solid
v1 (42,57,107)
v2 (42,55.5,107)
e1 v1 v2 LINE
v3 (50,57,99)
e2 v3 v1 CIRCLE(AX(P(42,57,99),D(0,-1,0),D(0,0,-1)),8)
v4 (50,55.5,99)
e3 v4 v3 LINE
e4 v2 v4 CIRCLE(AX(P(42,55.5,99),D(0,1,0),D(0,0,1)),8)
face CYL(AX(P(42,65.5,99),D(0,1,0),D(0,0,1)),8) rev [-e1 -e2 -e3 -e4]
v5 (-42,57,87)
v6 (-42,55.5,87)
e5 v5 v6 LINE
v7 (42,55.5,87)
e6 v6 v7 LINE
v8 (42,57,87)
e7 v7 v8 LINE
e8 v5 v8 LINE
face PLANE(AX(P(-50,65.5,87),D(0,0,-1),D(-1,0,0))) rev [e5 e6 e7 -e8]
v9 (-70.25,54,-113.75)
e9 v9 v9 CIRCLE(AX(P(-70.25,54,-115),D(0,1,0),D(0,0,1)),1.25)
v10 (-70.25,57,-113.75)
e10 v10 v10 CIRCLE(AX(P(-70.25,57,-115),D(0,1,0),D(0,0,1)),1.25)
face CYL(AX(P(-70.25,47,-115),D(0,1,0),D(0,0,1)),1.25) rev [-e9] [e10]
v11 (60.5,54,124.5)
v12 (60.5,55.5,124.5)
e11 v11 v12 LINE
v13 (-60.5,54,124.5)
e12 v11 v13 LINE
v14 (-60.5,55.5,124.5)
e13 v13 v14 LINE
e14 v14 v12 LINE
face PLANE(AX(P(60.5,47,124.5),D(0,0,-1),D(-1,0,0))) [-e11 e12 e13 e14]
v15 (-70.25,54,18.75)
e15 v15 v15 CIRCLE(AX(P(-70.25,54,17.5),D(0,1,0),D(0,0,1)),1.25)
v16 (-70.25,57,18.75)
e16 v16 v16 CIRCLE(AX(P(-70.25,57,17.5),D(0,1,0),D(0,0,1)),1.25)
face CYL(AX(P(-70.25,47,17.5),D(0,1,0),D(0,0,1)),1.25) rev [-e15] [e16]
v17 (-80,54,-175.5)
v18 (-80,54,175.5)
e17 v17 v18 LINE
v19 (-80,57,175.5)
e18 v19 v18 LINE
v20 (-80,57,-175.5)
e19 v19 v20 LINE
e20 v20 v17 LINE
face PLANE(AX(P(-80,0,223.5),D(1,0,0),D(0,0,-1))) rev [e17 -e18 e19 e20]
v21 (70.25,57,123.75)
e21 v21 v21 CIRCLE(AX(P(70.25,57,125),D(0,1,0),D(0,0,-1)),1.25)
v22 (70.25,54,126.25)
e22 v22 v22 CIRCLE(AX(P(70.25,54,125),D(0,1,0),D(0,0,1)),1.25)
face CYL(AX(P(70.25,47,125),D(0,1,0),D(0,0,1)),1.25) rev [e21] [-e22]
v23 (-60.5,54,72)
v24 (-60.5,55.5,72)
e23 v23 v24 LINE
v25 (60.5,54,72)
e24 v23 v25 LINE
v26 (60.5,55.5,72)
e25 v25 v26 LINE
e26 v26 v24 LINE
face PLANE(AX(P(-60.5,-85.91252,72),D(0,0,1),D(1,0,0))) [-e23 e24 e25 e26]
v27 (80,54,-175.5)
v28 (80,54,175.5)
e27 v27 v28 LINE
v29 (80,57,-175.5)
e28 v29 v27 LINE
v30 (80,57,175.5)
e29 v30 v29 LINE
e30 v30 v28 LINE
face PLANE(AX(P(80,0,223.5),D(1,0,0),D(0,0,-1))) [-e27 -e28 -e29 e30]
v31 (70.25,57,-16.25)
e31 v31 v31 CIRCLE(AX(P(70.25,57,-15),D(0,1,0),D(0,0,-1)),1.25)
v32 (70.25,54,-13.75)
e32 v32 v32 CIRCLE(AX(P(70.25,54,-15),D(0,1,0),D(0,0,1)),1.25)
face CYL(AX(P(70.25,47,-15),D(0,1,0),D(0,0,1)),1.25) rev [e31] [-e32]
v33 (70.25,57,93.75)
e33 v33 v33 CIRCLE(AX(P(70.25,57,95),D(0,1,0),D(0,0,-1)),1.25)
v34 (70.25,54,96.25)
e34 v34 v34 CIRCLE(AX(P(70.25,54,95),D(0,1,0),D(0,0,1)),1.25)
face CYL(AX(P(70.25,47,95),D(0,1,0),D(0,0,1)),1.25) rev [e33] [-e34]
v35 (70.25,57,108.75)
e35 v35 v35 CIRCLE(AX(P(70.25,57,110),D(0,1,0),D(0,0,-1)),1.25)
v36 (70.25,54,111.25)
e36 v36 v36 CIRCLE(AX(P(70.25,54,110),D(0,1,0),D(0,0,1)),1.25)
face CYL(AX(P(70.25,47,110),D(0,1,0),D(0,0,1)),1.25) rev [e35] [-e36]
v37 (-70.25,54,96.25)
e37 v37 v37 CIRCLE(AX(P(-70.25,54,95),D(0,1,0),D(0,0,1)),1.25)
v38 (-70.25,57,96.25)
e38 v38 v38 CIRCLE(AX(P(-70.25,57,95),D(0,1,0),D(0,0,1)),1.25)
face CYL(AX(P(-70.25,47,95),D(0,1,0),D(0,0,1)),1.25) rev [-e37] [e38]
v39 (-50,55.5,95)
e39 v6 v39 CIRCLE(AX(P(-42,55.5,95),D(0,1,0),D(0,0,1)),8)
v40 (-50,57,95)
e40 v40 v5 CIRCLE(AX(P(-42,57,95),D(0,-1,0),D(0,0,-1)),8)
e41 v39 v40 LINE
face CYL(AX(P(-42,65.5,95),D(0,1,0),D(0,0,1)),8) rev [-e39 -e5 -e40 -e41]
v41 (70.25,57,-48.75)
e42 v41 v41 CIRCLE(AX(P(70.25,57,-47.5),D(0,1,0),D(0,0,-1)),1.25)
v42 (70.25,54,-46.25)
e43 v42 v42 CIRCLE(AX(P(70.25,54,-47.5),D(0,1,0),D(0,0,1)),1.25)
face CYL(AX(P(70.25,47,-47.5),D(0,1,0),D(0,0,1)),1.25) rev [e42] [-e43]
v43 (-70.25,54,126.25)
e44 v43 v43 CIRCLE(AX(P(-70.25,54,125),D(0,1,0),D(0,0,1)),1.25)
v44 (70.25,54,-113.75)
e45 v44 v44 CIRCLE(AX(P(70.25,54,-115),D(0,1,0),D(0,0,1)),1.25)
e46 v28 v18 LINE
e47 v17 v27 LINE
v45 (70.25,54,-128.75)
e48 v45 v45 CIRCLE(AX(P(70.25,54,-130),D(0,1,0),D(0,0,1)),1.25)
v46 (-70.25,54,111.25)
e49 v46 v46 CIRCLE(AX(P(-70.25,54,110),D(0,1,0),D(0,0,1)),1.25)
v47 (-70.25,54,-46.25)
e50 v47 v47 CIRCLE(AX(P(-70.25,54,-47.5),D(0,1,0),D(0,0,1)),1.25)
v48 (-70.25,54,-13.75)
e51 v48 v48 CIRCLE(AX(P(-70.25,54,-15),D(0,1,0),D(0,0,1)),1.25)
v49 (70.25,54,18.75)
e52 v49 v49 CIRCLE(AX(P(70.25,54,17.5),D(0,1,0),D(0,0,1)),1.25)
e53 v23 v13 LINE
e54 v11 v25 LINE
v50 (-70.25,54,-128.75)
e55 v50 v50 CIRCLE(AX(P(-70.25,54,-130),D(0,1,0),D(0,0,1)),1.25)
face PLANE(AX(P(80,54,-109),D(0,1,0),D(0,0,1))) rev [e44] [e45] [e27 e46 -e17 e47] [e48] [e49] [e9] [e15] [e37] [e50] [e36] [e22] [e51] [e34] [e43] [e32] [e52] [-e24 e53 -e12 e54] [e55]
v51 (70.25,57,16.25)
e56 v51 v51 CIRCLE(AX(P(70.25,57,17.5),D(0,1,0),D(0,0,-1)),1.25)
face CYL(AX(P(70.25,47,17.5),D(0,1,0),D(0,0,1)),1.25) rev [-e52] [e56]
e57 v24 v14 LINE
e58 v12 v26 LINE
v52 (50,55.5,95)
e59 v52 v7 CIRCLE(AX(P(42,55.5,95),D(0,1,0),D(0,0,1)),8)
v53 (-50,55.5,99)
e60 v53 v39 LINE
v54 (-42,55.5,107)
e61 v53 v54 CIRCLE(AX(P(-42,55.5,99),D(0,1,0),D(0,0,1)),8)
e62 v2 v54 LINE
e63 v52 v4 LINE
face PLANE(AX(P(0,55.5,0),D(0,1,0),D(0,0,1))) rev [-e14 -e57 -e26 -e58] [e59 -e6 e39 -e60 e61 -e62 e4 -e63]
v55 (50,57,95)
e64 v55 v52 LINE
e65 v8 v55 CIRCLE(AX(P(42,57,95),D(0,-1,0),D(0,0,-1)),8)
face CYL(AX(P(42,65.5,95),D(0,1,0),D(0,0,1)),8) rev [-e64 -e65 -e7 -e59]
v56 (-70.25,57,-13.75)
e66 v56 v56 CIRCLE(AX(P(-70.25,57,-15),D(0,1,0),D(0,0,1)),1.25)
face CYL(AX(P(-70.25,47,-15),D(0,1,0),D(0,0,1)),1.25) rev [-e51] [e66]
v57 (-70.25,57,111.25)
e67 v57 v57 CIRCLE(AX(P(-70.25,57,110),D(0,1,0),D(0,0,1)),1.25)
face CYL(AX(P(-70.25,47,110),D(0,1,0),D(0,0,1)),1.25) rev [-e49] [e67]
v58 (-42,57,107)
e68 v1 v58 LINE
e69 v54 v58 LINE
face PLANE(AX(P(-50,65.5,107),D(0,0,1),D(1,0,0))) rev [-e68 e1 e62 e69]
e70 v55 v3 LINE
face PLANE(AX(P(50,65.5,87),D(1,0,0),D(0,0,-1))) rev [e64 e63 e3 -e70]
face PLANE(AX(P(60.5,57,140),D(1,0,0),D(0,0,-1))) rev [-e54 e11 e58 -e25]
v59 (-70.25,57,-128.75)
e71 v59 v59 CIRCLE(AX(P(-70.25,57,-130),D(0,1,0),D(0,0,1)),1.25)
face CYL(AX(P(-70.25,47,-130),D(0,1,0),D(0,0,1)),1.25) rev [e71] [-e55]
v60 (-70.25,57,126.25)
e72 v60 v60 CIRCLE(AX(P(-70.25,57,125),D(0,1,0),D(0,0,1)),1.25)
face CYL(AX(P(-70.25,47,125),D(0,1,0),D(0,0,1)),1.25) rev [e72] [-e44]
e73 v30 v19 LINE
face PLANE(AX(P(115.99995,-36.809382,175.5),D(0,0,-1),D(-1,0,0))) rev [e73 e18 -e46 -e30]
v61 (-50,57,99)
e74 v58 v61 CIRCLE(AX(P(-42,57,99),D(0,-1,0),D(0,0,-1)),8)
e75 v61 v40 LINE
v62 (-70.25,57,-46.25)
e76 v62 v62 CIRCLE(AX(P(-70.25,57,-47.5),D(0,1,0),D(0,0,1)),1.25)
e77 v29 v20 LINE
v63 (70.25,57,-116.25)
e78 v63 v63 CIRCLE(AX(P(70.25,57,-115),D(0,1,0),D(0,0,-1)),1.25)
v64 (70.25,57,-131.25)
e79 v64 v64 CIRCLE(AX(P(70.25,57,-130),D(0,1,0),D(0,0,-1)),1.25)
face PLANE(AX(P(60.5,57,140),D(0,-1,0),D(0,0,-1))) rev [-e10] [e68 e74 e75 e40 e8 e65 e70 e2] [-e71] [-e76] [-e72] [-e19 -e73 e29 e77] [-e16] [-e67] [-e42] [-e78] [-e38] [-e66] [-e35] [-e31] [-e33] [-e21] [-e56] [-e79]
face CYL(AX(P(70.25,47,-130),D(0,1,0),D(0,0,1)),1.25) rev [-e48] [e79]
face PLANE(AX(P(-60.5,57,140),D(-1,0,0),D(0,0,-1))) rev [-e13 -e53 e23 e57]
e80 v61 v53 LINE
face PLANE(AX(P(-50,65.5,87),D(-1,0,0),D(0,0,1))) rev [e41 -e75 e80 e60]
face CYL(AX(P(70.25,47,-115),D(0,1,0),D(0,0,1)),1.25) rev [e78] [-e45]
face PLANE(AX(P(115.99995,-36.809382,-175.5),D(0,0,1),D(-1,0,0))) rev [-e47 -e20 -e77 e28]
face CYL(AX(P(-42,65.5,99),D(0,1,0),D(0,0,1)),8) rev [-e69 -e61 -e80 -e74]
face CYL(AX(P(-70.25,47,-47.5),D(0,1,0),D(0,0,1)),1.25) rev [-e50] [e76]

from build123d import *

# Parameters (mm, degrees)
EXTRUDE_1_DEPTH          = 140
EXTRUDE_1_DEPTH_BACK     = 140
EXTRUDE_3_DEPTH          = 35.5
CUT_EXTRUDE_2_REACH      = 197.473
SKETCH_6_W               = 150
SKETCH_6_H               = 80
CUT_EXTRUDE_4_DEPTH      = 6
EXTRUDE_4_DEPTH          = 60.5
CUT_EXTRUDE_START        = -59
CUT_EXTRUDE_6_DEPTH      = 55
CUT_EXTRUDE_START_2      = -4
CUT_EXTRUDE_7_DEPTH      = 27
CUT_EXTRUDE_8_DEPTH      = 35.5
CUT_EXTRUDE_START_3      = -35.5
CUT_EXTRUDE_9_DEPTH      = 35.5
EXTRUDE_5_REACH          = 300.939
SKETCH_25_W              = 121
SKETCH_25_H              = 10
EXTRUDE_6_DEPTH          = 21.5
SKETCH_27_W              = 121
SKETCH_27_H              = 52.5
EXTRUDE_7_DEPTH          = 1.5
SKETCH_28_W              = 121
SKETCH_28_H              = 2
EXTRUDE_8_DEPTH          = 10
CUT_EXTRUDE_11_REACH     = 346.114
SKETCH_29_R              = 2
PATTERN_CIRCULAR_2_COUNT = 10
CUT_EXTRUDE_12_REACH     = 346.114
SKETCH_30_R              = 2
PATTERN_CIRCULAR_3_COUNT = 10
MIRROR_START             = -140
MIRROR_10_OUTLINE_R      = 2
MIRROR_10_DEPTH          = 280
MIRROR_10_2_OUTLINE_R    = 2
MIRROR_10_2_DEPTH        = 4
MIRROR_START_2           = 136
MIRROR_10_3_OUTLINE_R    = 2
MIRROR_10_3_DEPTH        = 4
EXTRUDE_9_REACH          = 263.648
SKETCH_31_W              = 21
SKETCH_31_H              = 16.5
EXTRUDE_10_REACH         = 292.975
SKETCH_34_W              = 121
SKETCH_34_H              = 154
EXTRUDE_11_DEPTH         = 5
EXTRUDE_12_REACH         = 378.928
SKETCH_36_W              = 121
SKETCH_36_H              = 3
EXTRUDE_13_REACH         = 378.928
SKETCH_37_W              = 121
SKETCH_37_H              = 3
SKETCH_38_W              = 100
SKETCH_38_H              = 20
CUT_EXTRUDE_13_DEPTH     = 10
FILLET_1_R               = 8
SKETCH_40_W              = 344.103621996
SKETCH_40_H              = 61.572842363
SKETCH_40_W_2            = 92.051810998
SKETCH_40_H_2            = 3
CUT_EXTRUDE_16_DEPTH     = 399
SKETCH_41_R              = 1.25
CUT_EXTRUDE_17_DEPTH     = 10


# Read off the part's stored shape, not the designer's step: 镜向10
with BuildPart() as part:
    # 草图2 → 凸台-拉伸1 (new, two sides: drawn at the far end of the back side and taken through both)
    with BuildSketch(Plane.XY.offset(-EXTRUDE_1_DEPTH_BACK)):
        with BuildLine():
            Line((60.5, 57), (80, 57))
            add(Edge.make_bspline(
                [(80, 57), (110.715171184, 57), (118.023084898, 36.99301361), (125, 20.498008369), (125, 0)],
                knots=[0, 0, 0, 0, 0, 1, 1, 1, 1, 1], degree=4))
            add(Edge.make_bspline(
                [(80, -57), (110.715171184, -57), (118.023084898, -36.99301361), (125, -20.498008369), (125, 0)],
                knots=[0, 0, 0, 0, 0, 1, 1, 1, 1, 1], degree=4))
            Line((80, -57), (60.5, -57))
            Line((60.5, -57), (60.5, -35.5))
            ThreePointArc((60.5, -35.5), (96, 0), (60.5, 35.5))
            Line((60.5, 35.5), (60.5, 57))
        make_face()
    extrude(amount=EXTRUDE_1_DEPTH + EXTRUDE_1_DEPTH_BACK)

    # 草图5 → 凸台-拉伸3 (add)
    with BuildSketch(Plane.XY.offset(140)):
        with BuildLine():
            Line((60.5, -50), (60.5, -57))
            Line((60.5, -57), (80, -57))
            add(Edge.make_bspline(
                [(80, -57), (110.715171184, -57), (118.023084898, -36.99301361), (125, -20.498008369), (125, 0)],
                knots=[0, 0, 0, 0, 0, 1, 1, 1, 1, 1], degree=4))
            add(Edge.make_bspline(
                [(125, 0), (125, 20.498008369), (118.023084898, 36.99301361), (110.715171184, 57), (80, 57)],
                knots=[0, 0, 0, 0, 0, 1, 1, 1, 1, 1], degree=4))
            Line((80, 57), (60.5, 57))
            Line((60.5, 57), (60.5, 50))
            ThreePointArc((60.5, 50), (110.5, 0), (60.5, -50))
        make_face()
    extrude_3 = extrude(amount=EXTRUDE_3_DEPTH)

    # 镜向2: 凸台-拉伸3 across plane
    add(extrude_3.mirror(Plane.XY))

    # 草图6 → 切除-拉伸2 (cut, up to next)
    with BuildSketch(Plane.ZY.offset(-60.5), mode=Mode.PRIVATE) as cut_extrude_2_sk1:
        with Locations((-15, 0)):
            Rectangle(SKETCH_6_W, SKETCH_6_H)
    cut_extrude_2_tool1 = extrude(cut_extrude_2_sk1.sketch, amount=-CUT_EXTRUDE_2_REACH, mode=Mode.PRIVATE) & part.part
    add(cut_extrude_2_tool1.solids().sort_by_distance((60.5, 0, -15))[0], mode=Mode.SUBTRACT)

    # 草图9 → 切除-拉伸4 (cut, symmetric)
    with BuildSketch(Plane(origin=(0, 0, 0), x_dir=(1, 0, 0), z_dir=(0, 1, 0))):
        Polygon((113.429186382, -60), (119.929186382, -60), (119.929186382, -75), (116.929186382, -75), (111.929186382, -69.041232037), (113.429186382, -67.541232037), align=None)
    cut_extrude_4 = extrude(amount=CUT_EXTRUDE_4_DEPTH, both=True, mode=Mode.SUBTRACT)

    # 镜向3: 切除-拉伸4 across plane
    add(cut_extrude_4.mirror(Plane(origin=(0, 0, -15), x_dir=(1, 0, 0), z_dir=(0, 0, -1))), mode=Mode.SUBTRACT)

    # 草图10 → 凸台-拉伸4 (add)
    with BuildSketch(Plane.ZY.offset(-60.5)):
        Polygon((-90, 40), (-90, 35.5), (-92, 35.5), (-92, 42), (62, 42), (62, 35.5), (60, 35.5), (60, 40), align=None)
    extrude(amount=EXTRUDE_4_DEPTH)

    # 草图18 → 切除-拉伸6 (cut)
    with BuildSketch(Plane.XY.offset(140).offset(CUT_EXTRUDE_START)):
        with BuildLine():
            Line((60.5, 54), (60.5, 35.5))
            ThreePointArc((60.5, 35.5), (96, 0), (60.5, -35.5))
            Line((60.5, -35.5), (60.5, -54))
            Line((60.5, -54), (80, -54))
            add(Edge.make_bspline(
                [(80, -54), (84.874930894, -54), (88.983824843, -53.408674679), (94.293485921, -51.914645093), (95.921328006, -51.314644751), (98.940749379, -49.944603182), (100.332473442, -49.174486853), (102.921509382, -47.489185635), (104.118858715, -46.573864409), (106.351651802, -44.617586852), (107.387031345, -43.57654345), (110.285874468, -40.291394559), (111.943828956, -37.885646851), (114.834227827, -32.778060673), (116.065931681, -30.077252128), (118.174928997, -24.486846885), (119.052306998, -21.597764181), (120.481395372, -15.683640995), (121.033233096, -12.658872533), (121.792444122, -6.461288023), (122, -3.288695832), (122, 0)],
                knots=[0, 0, 0, 0, 0.125, 0.125, 0.1875, 0.1875, 0.25, 0.25, 0.3125, 0.3125, 0.375, 0.375, 0.5, 0.5, 0.625, 0.625, 0.75, 0.75, 0.875, 0.875, 1, 1, 1, 1], degree=3))
            add(Edge.make_bspline(
                [(122, 0), (122, 3.288695832), (121.792444122, 6.461288023), (121.033233096, 12.658872533), (120.481395372, 15.683640995), (119.052306998, 21.597764181), (118.174928997, 24.486846885), (116.065931681, 30.077252128), (114.834227827, 32.778060673), (111.943828956, 37.885646851), (110.285874468, 40.291394559), (107.387031345, 43.57654345), (106.351651802, 44.617586852), (104.118858715, 46.573864409), (102.921509382, 47.489185635), (100.332473442, 49.174486853), (98.940749379, 49.944603182), (95.921328006, 51.314644751), (94.293485921, 51.914645093), (88.983824843, 53.408674679), (84.874930894, 54), (80, 54)],
                knots=[0, 0, 0, 0, 0.125, 0.125, 0.25, 0.25, 0.375, 0.375, 0.5, 0.5, 0.625, 0.625, 0.6875, 0.6875, 0.75, 0.75, 0.8125, 0.8125, 0.875, 0.875, 1, 1, 1, 1], degree=3))
            Line((80, 54), (60.5, 54))
        make_face()
    extrude(amount=CUT_EXTRUDE_6_DEPTH, mode=Mode.SUBTRACT)

    # 草图19 → 切除-拉伸7 (cut)
    with BuildSketch(Plane(origin=(0, 0, -140), x_dir=(-1, 0, 0), z_dir=(0, 0, -1)).offset(CUT_EXTRUDE_START_2)):
        with BuildLine():
            Line((-60.5, 54), (-60.5, 35.5))
            ThreePointArc((-60.5, 35.5), (-96, 0), (-60.5, -35.5))
            Line((-60.5, -35.5), (-60.5, -54))
            Line((-60.5, -54), (-80, -54))
            add(Edge.make_bspline(
                [(-80, -54), (-84.874930894, -54), (-88.983824843, -53.408674679), (-94.293485921, -51.914645093), (-95.921328006, -51.314644751), (-98.940749379, -49.944603182), (-100.332473442, -49.174486853), (-102.921509382, -47.489185635), (-104.118858715, -46.573864409), (-106.351651802, -44.617586852), (-107.387031345, -43.57654345), (-110.285874468, -40.291394559), (-111.943828956, -37.885646851), (-114.834227827, -32.778060673), (-116.065931681, -30.077252128), (-118.174928997, -24.486846885), (-119.052306998, -21.597764181), (-120.481395372, -15.683640995), (-121.033233096, -12.658872533), (-121.792444122, -6.461288023), (-122, -3.288695832), (-122, 0)],
                knots=[0, 0, 0, 0, 0.125, 0.125, 0.1875, 0.1875, 0.25, 0.25, 0.3125, 0.3125, 0.375, 0.375, 0.5, 0.5, 0.625, 0.625, 0.75, 0.75, 0.875, 0.875, 1, 1, 1, 1], degree=3))
            add(Edge.make_bspline(
                [(-122, 0), (-122, 3.288695832), (-121.792444122, 6.461288023), (-121.033233096, 12.658872533), (-120.481395372, 15.683640995), (-119.052306998, 21.597764181), (-118.174928997, 24.486846885), (-116.065931681, 30.077252128), (-114.834227827, 32.778060673), (-111.943828956, 37.885646851), (-110.285874468, 40.291394559), (-107.387031345, 43.57654345), (-106.351651802, 44.617586852), (-104.118858715, 46.573864409), (-102.921509382, 47.489185635), (-100.332473442, 49.174486853), (-98.940749379, 49.944603182), (-95.921328006, 51.314644751), (-94.293485921, 51.914645093), (-88.983824843, 53.408674679), (-84.874930894, 54), (-80, 54)],
                knots=[0, 0, 0, 0, 0.125, 0.125, 0.25, 0.25, 0.375, 0.375, 0.5, 0.5, 0.625, 0.625, 0.6875, 0.6875, 0.75, 0.75, 0.8125, 0.8125, 0.875, 0.875, 1, 1, 1, 1], degree=3))
            Line((-80, 54), (-60.5, 54))
        make_face()
    extrude(amount=-CUT_EXTRUDE_7_DEPTH, mode=Mode.SUBTRACT)

    # 草图20 → 切除-拉伸8 (cut)
    with BuildSketch(Plane.XY.offset(175.5)):
        with BuildLine():
            Line((60.5, 54), (60.5, 50))
            ThreePointArc((60.5, 50), (110.5, 0), (60.5, -50))
            Line((60.5, -50), (60.5, -54))
            Line((60.5, -54), (80, -54))
            add(Edge.make_bspline(
                [(80, -54), (84.874930894, -54), (88.983824843, -53.408674679), (94.293485921, -51.914645093), (95.921328006, -51.314644751), (98.940749379, -49.944603182), (100.332473442, -49.174486853), (102.921509382, -47.489185635), (104.118858715, -46.573864409), (106.351651802, -44.617586852), (107.387031345, -43.57654345), (110.285874468, -40.291394559), (111.943828956, -37.885646851), (114.834227827, -32.778060673), (116.065931681, -30.077252128), (118.174928997, -24.486846885), (119.052306998, -21.597764181), (120.481395372, -15.683640995), (121.033233096, -12.658872533), (121.792444122, -6.461288023), (122, -3.288695832), (122, 0)],
                knots=[0, 0, 0, 0, 0.125, 0.125, 0.1875, 0.1875, 0.25, 0.25, 0.3125, 0.3125, 0.375, 0.375, 0.5, 0.5, 0.625, 0.625, 0.75, 0.75, 0.875, 0.875, 1, 1, 1, 1], degree=3))
            add(Edge.make_bspline(
                [(122, 0), (122, 3.288695832), (121.792444122, 6.461288023), (121.033233096, 12.658872533), (120.481395372, 15.683640995), (119.052306998, 21.597764181), (118.174928997, 24.486846885), (116.065931681, 30.077252128), (114.834227827, 32.778060673), (111.943828956, 37.885646851), (110.285874468, 40.291394559), (107.387031345, 43.57654345), (106.351651802, 44.617586852), (104.118858715, 46.573864409), (102.921509382, 47.489185635), (100.332473442, 49.174486853), (98.940749379, 49.944603182), (95.921328006, 51.314644751), (94.293485921, 51.914645093), (88.983824843, 53.408674679), (84.874930894, 54), (80, 54)],
                knots=[0, 0, 0, 0, 0.125, 0.125, 0.25, 0.25, 0.375, 0.375, 0.5, 0.5, 0.625, 0.625, 0.6875, 0.6875, 0.75, 0.75, 0.8125, 0.8125, 0.875, 0.875, 1, 1, 1, 1], degree=3))
            Line((80, 54), (60.5, 54))
        make_face()
    extrude(amount=-CUT_EXTRUDE_8_DEPTH, mode=Mode.SUBTRACT)

    # 草图21 → 切除-拉伸9 (cut)
    with BuildSketch(Plane(origin=(0, 0, -175.5), x_dir=(-1, 0, 0), z_dir=(0, 0, -1)).offset(CUT_EXTRUDE_START_3)):
        with BuildLine():
            Line((-60.5, -50), (-60.5, -54))
            Line((-60.5, -54), (-80, -54))
            add(Edge.make_bspline(
                [(-80, -54), (-84.874930894, -54), (-88.983824843, -53.408674679), (-94.293485921, -51.914645093), (-95.921328006, -51.314644751), (-98.940749379, -49.944603182), (-100.332473442, -49.174486853), (-102.921509382, -47.489185635), (-104.118858715, -46.573864409), (-106.351651802, -44.617586852), (-107.387031345, -43.57654345), (-110.285874468, -40.291394559), (-111.943828956, -37.885646851), (-114.834227827, -32.778060673), (-116.065931681, -30.077252128), (-118.174928997, -24.486846885), (-119.052306998, -21.597764181), (-120.481395372, -15.683640995), (-121.033233096, -12.658872533), (-121.792444122, -6.461288023), (-122, -3.288695832), (-122, 0)],
                knots=[0, 0, 0, 0, 0.125, 0.125, 0.1875, 0.1875, 0.25, 0.25, 0.3125, 0.3125, 0.375, 0.375, 0.5, 0.5, 0.625, 0.625, 0.75, 0.75, 0.875, 0.875, 1, 1, 1, 1], degree=3))
            add(Edge.make_bspline(
                [(-122, 0), (-122, 3.288695832), (-121.792444122, 6.461288023), (-121.033233096, 12.658872533), (-120.481395372, 15.683640995), (-119.052306998, 21.597764181), (-118.174928997, 24.486846885), (-116.065931681, 30.077252128), (-114.834227827, 32.778060673), (-111.943828956, 37.885646851), (-110.285874468, 40.291394559), (-107.387031345, 43.57654345), (-106.351651802, 44.617586852), (-104.118858715, 46.573864409), (-102.921509382, 47.489185635), (-100.332473442, 49.174486853), (-98.940749379, 49.944603182), (-95.921328006, 51.314644751), (-94.293485921, 51.914645093), (-88.983824843, 53.408674679), (-84.874930894, 54), (-80, 54)],
                knots=[0, 0, 0, 0, 0.125, 0.125, 0.25, 0.25, 0.375, 0.375, 0.5, 0.5, 0.625, 0.625, 0.6875, 0.6875, 0.75, 0.75, 0.8125, 0.8125, 0.875, 0.875, 1, 1, 1, 1], degree=3))
            Line((-80, 54), (-60.5, 54))
            Line((-60.5, 54), (-60.5, 50))
            ThreePointArc((-60.5, 50), (-110.5, 0), (-60.5, -50))
        make_face()
    extrude(amount=CUT_EXTRUDE_9_DEPTH, mode=Mode.SUBTRACT)

    # 镜向9: part across plane


with BuildPart() as part_1:
    add(part.part)
    add(part.part.mirror(Plane.ZY))

    # 草图23 → 凸台-拉伸5 (add, up to next)
    with BuildSketch(Plane.XY.offset(-90), mode=Mode.PRIVATE) as extrude_5_sk1:
        with BuildLine():
            Line((-114.034351089, 40), (-110, 40))
            Line((-110, 40), (-110, -40))
            Line((-110, -40), (-114.034351089, -40))
            add(Edge.make_bspline(
                [(-114.034351089, -40), (-119.771865737, -31.446745908), (-122.888445187, -21.34184926), (-125, -11.276676628), (-125, 0)],
                knots=[0.449864766, 0.449864766, 0.449864766, 0.449864766, 0.449864766, 1, 1, 1, 1, 1], degree=4))
            add(Edge.make_bspline(
                [(-125, 0), (-125, 11.276676628), (-122.888445187, 21.34184926), (-119.771865737, 31.446745908), (-114.034351089, 40)],
                knots=[0, 0, 0, 0, 0, 0.550135234, 0.550135234, 0.550135234, 0.550135234, 0.550135234], degree=4))
        make_face()
    extrude_5_tool1 = extrude(extrude_5_sk1.sketch, amount=EXTRUDE_5_REACH, mode=Mode.PRIVATE) - part_1.part
    add(extrude_5_tool1.solids().sort_by_distance((-116.2158, 0, -90))[0])

    # 草图25 → 凸台-拉伸6 (add)
    with BuildSketch(Plane(origin=(0, 57, 0), x_dir=(1, 0, 0), z_dir=(0, 1, 0))):
        with Locations((0, -67)):
            Rectangle(SKETCH_25_W, SKETCH_25_H)
    extrude(amount=-EXTRUDE_6_DEPTH)



with BuildPart() as body_2:
    # 草图27 → 凸台-拉伸7 (new body)
    with BuildSketch(Plane(origin=(0, 57, 0), x_dir=(1, 0, 0), z_dir=(0, 1, 0))):
        with Locations((0, -98.25)):
            Rectangle(SKETCH_27_W, SKETCH_27_H)
    extrude(amount=-EXTRUDE_7_DEPTH)


with BuildPart() as part_2:
    add(part_1.part)

    add(body_2.part)  # 凸台-拉伸8 merges body 2
    # 草图28 → 凸台-拉伸8 (add)
    with BuildSketch(Plane(origin=(0, 57, 0), x_dir=(1, 0, 0), z_dir=(0, 1, 0))):
        with Locations((0, -125.5)):
            Rectangle(SKETCH_28_W, SKETCH_28_H)
    extrude(amount=-EXTRUDE_8_DEPTH)

    # 草图29 → 切除-拉伸11 (cut, up to next)
    with BuildSketch(Plane.XY.offset(140), mode=Mode.PRIVATE) as cut_extrude_11_sk1:
        with Locations((-85.186980596, 33.978713764)):
            Circle(SKETCH_29_R)
    cut_extrude_11_tool1 = extrude(cut_extrude_11_sk1.sketch, amount=-CUT_EXTRUDE_11_REACH, mode=Mode.PRIVATE) & part_2.part
    cut_extrude_11 = cut_extrude_11_tool1.solids().sort_by_distance((-85.186981, 33.978714, 140))[0]
    add(cut_extrude_11, mode=Mode.SUBTRACT)

    # 阵列(圆周)2: 切除-拉伸11 ×10 about axis, 6 skipped
    pattern_circular_2_axis = Axis((-60.5, 0, 140), (0, 0, -1))
    add([cut_extrude_11.rotate(pattern_circular_2_axis, i * 360 / PATTERN_CIRCULAR_2_COUNT) for i in range(1, PATTERN_CIRCULAR_2_COUNT) if i not in (1, 2, 3, 4, 5, 6)], mode=Mode.SUBTRACT)

    # 草图30 → 切除-拉伸12 (cut, up to next)
    with BuildSketch(Plane(origin=(0, 0, -140), x_dir=(-1, 0, 0), z_dir=(0, 0, -1)), mode=Mode.PRIVATE) as cut_extrude_12_sk1:
        with Locations(Location((85.186980596, 33.978713764, 0), (0, 0, 180))):
            Circle(SKETCH_30_R)
    cut_extrude_12_tool1 = extrude(cut_extrude_12_sk1.sketch, amount=-CUT_EXTRUDE_12_REACH, mode=Mode.PRIVATE) & part_2.part
    cut_extrude_12 = cut_extrude_12_tool1.solids().sort_by_distance((-85.186981, 33.978714, -140))[0]
    add(cut_extrude_12, mode=Mode.SUBTRACT)

    # 阵列(圆周)3: 切除-拉伸12 ×10 about axis, 6 skipped
    pattern_circular_3_axis = Axis((-60.5, 0, 140), (0, 0, -1))
    add([cut_extrude_12.rotate(pattern_circular_3_axis, i * 360 / PATTERN_CIRCULAR_3_COUNT) for i in range(1, PATTERN_CIRCULAR_3_COUNT) if i not in (1, 2, 3, 4, 5, 6)], mode=Mode.SUBTRACT)

    # 镜向10 outline → 镜向10 (cut)
    with BuildSketch(Plane.XY.offset(MIRROR_START)):
        with Locations((85.186980596, 33.978713764)):
            Circle(MIRROR_10_OUTLINE_R)
    extrude(amount=MIRROR_10_DEPTH, mode=Mode.SUBTRACT)

    # Mirror 10 2 outline → Mirror 10 2 (cut)
    with BuildSketch(Plane.XY.offset(MIRROR_START)):
        with Locations((100.444373684, 12.978713764)):
            Circle(MIRROR_10_2_OUTLINE_R)
        with Locations((100.444373684, -12.978713764)):
            Circle(MIRROR_10_2_OUTLINE_R)
        with Locations((85.186980596, -33.978713764)):
            Circle(MIRROR_10_2_OUTLINE_R)
    extrude(amount=MIRROR_10_2_DEPTH, mode=Mode.SUBTRACT)

    # Mirror 10 3 outline → Mirror 10 3 (cut)
    with BuildSketch(Plane.XY.offset(MIRROR_START_2)):
        with Locations((100.444373684, 12.978713764)):
            Circle(MIRROR_10_3_OUTLINE_R)
        with Locations((100.444373684, -12.978713764)):
            Circle(MIRROR_10_3_OUTLINE_R)
        with Locations((85.186980596, -33.978713764)):
            Circle(MIRROR_10_3_OUTLINE_R)
    extrude(amount=MIRROR_10_3_DEPTH, mode=Mode.SUBTRACT)

    # 草图31 → 凸台-拉伸9 (add, up to next)
    with BuildSketch(Plane(origin=(-60.5, 0, 0), x_dir=(0, 0, -1), z_dir=(1, 0, 0)), mode=Mode.PRIVATE) as extrude_9_sk1:
        with Locations((-70.5, -43.75)):
            Rectangle(SKETCH_31_W, SKETCH_31_H)
    extrude_9_tool1 = extrude(extrude_9_sk1.sketch, amount=EXTRUDE_9_REACH, mode=Mode.PRIVATE) - part_2.part
    # 草图31 → 凸台-拉伸9 (add, up to next)
    with BuildSketch(Plane(origin=(-60.5, 0, 0), x_dir=(0, 0, -1), z_dir=(1, 0, 0)), mode=Mode.PRIVATE) as extrude_9_sk2:
        Polygon((109, -52), (109, -35.5), (90, -35.5), (90, -40), (90, -52), align=None)
    extrude_9_tool2 = extrude(extrude_9_sk2.sketch, amount=EXTRUDE_9_REACH, mode=Mode.PRIVATE) - part_2.part
    add(extrude_9_tool1.solids().sort_by_distance((-60.5, -43.75, 70.5))[0])
    add(extrude_9_tool2.solids().sort_by_distance((-60.5, -43.75, -99.5))[0])

    # 草图33 → 凸台-拉伸10 (add, up to next)
    with BuildSketch(Plane.XY.offset(81), mode=Mode.PRIVATE) as extrude_10_sk1:
        with BuildLine():
            Line((62.5, 54), (62.5, 35.443617197))
            ThreePointArc((62.5, 35.443617197), (61.500397299, 35.4859015), (60.5, 35.5))
            Line((60.5, 35.5), (60.5, 54))
            Line((60.5, 54), (62.5, 54))
        make_face()
    extrude_10_tool1 = extrude(extrude_10_sk1.sketch, amount=EXTRUDE_10_REACH, mode=Mode.PRIVATE) - part_2.part
    extrude_10 = extrude_10_tool1.solids().sort_by_distance((61.500507, 44.740598, 81))[0]
    add(extrude_10)

    # 镜向11: 凸台-拉伸10 across plane
    add(extrude_10.mirror(Plane(origin=(0, 0, 0), x_dir=(0, 0, 1), z_dir=(1, 0, 0))))

    # 草图34 → 凸台-拉伸11 (add)
    with BuildSketch(Plane(origin=(0, 42, 0), x_dir=(1, 0, 0), z_dir=(0, 1, 0))):
        with Locations((0, 15)):
            Rectangle(SKETCH_34_W, SKETCH_34_H)
    extrude(amount=EXTRUDE_11_DEPTH)

    # 草图36 → 凸台-拉伸12 (add, up to next)
    with BuildSketch(Plane.XY.offset(175.5), mode=Mode.PRIVATE) as extrude_12_sk1:
        with Locations((0, 55.5)):
            Rectangle(SKETCH_36_W, SKETCH_36_H)
    extrude_12_tool1 = extrude(extrude_12_sk1.sketch, amount=-EXTRUDE_12_REACH, mode=Mode.PRIVATE) - part_2.part
    add(extrude_12_tool1.solids().sort_by_distance((0, 55.5, 175.5))[0])

    # 草图37 → 凸台-拉伸13 (add, up to next)
    with BuildSketch(Plane(origin=(0, 0, -175.5), x_dir=(-1, 0, 0), z_dir=(0, 0, -1)), mode=Mode.PRIVATE) as extrude_13_sk1:
        with Locations((0, 55.5)):
            Rectangle(SKETCH_37_W, SKETCH_37_H)
    extrude_13_tool1 = extrude(extrude_13_sk1.sketch, amount=-EXTRUDE_13_REACH, mode=Mode.PRIVATE) - part_2.part
    add(extrude_13_tool1.solids().sort_by_distance((0, 55.5, -175.5))[0])

    # 草图38 → 切除-拉伸13 (cut)
    with BuildSketch(Plane.XZ.offset(-55.5)):
        with Locations((0, 97)):
            Rectangle(SKETCH_38_W, SKETCH_38_H)
    extrude(amount=-CUT_EXTRUDE_13_DEPTH, mode=Mode.SUBTRACT)

    # 圆角1
    fillet_1_edges = [part_2.edges().sort_by_distance(p)[0] for p in [
        (50, 56.25, 107),
        (50, 56.25, 87),
        (-50, 56.25, 87),
        (-50, 56.25, 107),
    ]]
    fillet(fillet_1_edges, radius=FILLET_1_R)

    # 草图40 → 切除-拉伸16 (cut)
    with BuildSketch(Plane(origin=(0, 0, -175.5), x_dir=(-1, 0, 0), z_dir=(0, 0, -1))):
        Polygon((-172.051810998, 54), (-172.051810998, -54), (172.051810998, -54), (172.051810998, 54), (80, 54), (-80, 54), align=None)
        with Locations((0, -84.786421182)):
            Rectangle(SKETCH_40_W, SKETCH_40_H)
        with Locations((-126.025905499, 55.5)):
            Rectangle(SKETCH_40_W_2, SKETCH_40_H_2)
        with Locations((126.025905499, 55.5)):
            Rectangle(SKETCH_40_W_2, SKETCH_40_H_2)
    extrude(amount=-CUT_EXTRUDE_16_DEPTH, mode=Mode.SUBTRACT)

    # 草图41 → 切除-拉伸17 (cut)
    with BuildSketch(Plane(origin=(0, 57, 0), x_dir=(1, 0, 0), z_dir=(0, 1, 0))):
        with Locations(Location((-70.25, -95, 0), (0, 0, 270))):
            Circle(SKETCH_41_R)
        with Locations(Location((-70.25, -110, 0), (0, 0, 270))):
            Circle(SKETCH_41_R)
        with Locations(Location((-70.25, -125, 0), (0, 0, 270))):
            Circle(SKETCH_41_R)
        with Locations(Location((-70.25, 130, 0), (0, 0, 270))):
            Circle(SKETCH_41_R)
        with Locations(Location((-70.25, 115, 0), (0, 0, 270))):
            Circle(SKETCH_41_R)
        with Locations(Location((-70.25, 47.5, 0), (0, 0, 270))):
            Circle(SKETCH_41_R)
        with Locations(Location((-70.25, 15, 0), (0, 0, 270))):
            Circle(SKETCH_41_R)
        with Locations(Location((-70.25, -17.5, 0), (0, 0, 270))):
            Circle(SKETCH_41_R)
        with Locations(Location((70.25, -17.5, 0), (0, 0, 270))):
            Circle(SKETCH_41_R)
        with Locations(Location((70.25, 15, 0), (0, 0, 270))):
            Circle(SKETCH_41_R)
        with Locations(Location((70.25, 47.5, 0), (0, 0, 270))):
            Circle(SKETCH_41_R)
        with Locations(Location((70.25, 115, 0), (0, 0, 270))):
            Circle(SKETCH_41_R)
        with Locations(Location((70.25, 130, 0), (0, 0, 270))):
            Circle(SKETCH_41_R)
        with Locations(Location((70.25, -125, 0), (0, 0, 270))):
            Circle(SKETCH_41_R)
        with Locations(Location((70.25, -110, 0), (0, 0, 270))):
            Circle(SKETCH_41_R)
        with Locations(Location((70.25, -95, 0), (0, 0, 270))):
            Circle(SKETCH_41_R)
    extrude(amount=-CUT_EXTRUDE_17_DEPTH, mode=Mode.SUBTRACT)


solid = part_2.part
